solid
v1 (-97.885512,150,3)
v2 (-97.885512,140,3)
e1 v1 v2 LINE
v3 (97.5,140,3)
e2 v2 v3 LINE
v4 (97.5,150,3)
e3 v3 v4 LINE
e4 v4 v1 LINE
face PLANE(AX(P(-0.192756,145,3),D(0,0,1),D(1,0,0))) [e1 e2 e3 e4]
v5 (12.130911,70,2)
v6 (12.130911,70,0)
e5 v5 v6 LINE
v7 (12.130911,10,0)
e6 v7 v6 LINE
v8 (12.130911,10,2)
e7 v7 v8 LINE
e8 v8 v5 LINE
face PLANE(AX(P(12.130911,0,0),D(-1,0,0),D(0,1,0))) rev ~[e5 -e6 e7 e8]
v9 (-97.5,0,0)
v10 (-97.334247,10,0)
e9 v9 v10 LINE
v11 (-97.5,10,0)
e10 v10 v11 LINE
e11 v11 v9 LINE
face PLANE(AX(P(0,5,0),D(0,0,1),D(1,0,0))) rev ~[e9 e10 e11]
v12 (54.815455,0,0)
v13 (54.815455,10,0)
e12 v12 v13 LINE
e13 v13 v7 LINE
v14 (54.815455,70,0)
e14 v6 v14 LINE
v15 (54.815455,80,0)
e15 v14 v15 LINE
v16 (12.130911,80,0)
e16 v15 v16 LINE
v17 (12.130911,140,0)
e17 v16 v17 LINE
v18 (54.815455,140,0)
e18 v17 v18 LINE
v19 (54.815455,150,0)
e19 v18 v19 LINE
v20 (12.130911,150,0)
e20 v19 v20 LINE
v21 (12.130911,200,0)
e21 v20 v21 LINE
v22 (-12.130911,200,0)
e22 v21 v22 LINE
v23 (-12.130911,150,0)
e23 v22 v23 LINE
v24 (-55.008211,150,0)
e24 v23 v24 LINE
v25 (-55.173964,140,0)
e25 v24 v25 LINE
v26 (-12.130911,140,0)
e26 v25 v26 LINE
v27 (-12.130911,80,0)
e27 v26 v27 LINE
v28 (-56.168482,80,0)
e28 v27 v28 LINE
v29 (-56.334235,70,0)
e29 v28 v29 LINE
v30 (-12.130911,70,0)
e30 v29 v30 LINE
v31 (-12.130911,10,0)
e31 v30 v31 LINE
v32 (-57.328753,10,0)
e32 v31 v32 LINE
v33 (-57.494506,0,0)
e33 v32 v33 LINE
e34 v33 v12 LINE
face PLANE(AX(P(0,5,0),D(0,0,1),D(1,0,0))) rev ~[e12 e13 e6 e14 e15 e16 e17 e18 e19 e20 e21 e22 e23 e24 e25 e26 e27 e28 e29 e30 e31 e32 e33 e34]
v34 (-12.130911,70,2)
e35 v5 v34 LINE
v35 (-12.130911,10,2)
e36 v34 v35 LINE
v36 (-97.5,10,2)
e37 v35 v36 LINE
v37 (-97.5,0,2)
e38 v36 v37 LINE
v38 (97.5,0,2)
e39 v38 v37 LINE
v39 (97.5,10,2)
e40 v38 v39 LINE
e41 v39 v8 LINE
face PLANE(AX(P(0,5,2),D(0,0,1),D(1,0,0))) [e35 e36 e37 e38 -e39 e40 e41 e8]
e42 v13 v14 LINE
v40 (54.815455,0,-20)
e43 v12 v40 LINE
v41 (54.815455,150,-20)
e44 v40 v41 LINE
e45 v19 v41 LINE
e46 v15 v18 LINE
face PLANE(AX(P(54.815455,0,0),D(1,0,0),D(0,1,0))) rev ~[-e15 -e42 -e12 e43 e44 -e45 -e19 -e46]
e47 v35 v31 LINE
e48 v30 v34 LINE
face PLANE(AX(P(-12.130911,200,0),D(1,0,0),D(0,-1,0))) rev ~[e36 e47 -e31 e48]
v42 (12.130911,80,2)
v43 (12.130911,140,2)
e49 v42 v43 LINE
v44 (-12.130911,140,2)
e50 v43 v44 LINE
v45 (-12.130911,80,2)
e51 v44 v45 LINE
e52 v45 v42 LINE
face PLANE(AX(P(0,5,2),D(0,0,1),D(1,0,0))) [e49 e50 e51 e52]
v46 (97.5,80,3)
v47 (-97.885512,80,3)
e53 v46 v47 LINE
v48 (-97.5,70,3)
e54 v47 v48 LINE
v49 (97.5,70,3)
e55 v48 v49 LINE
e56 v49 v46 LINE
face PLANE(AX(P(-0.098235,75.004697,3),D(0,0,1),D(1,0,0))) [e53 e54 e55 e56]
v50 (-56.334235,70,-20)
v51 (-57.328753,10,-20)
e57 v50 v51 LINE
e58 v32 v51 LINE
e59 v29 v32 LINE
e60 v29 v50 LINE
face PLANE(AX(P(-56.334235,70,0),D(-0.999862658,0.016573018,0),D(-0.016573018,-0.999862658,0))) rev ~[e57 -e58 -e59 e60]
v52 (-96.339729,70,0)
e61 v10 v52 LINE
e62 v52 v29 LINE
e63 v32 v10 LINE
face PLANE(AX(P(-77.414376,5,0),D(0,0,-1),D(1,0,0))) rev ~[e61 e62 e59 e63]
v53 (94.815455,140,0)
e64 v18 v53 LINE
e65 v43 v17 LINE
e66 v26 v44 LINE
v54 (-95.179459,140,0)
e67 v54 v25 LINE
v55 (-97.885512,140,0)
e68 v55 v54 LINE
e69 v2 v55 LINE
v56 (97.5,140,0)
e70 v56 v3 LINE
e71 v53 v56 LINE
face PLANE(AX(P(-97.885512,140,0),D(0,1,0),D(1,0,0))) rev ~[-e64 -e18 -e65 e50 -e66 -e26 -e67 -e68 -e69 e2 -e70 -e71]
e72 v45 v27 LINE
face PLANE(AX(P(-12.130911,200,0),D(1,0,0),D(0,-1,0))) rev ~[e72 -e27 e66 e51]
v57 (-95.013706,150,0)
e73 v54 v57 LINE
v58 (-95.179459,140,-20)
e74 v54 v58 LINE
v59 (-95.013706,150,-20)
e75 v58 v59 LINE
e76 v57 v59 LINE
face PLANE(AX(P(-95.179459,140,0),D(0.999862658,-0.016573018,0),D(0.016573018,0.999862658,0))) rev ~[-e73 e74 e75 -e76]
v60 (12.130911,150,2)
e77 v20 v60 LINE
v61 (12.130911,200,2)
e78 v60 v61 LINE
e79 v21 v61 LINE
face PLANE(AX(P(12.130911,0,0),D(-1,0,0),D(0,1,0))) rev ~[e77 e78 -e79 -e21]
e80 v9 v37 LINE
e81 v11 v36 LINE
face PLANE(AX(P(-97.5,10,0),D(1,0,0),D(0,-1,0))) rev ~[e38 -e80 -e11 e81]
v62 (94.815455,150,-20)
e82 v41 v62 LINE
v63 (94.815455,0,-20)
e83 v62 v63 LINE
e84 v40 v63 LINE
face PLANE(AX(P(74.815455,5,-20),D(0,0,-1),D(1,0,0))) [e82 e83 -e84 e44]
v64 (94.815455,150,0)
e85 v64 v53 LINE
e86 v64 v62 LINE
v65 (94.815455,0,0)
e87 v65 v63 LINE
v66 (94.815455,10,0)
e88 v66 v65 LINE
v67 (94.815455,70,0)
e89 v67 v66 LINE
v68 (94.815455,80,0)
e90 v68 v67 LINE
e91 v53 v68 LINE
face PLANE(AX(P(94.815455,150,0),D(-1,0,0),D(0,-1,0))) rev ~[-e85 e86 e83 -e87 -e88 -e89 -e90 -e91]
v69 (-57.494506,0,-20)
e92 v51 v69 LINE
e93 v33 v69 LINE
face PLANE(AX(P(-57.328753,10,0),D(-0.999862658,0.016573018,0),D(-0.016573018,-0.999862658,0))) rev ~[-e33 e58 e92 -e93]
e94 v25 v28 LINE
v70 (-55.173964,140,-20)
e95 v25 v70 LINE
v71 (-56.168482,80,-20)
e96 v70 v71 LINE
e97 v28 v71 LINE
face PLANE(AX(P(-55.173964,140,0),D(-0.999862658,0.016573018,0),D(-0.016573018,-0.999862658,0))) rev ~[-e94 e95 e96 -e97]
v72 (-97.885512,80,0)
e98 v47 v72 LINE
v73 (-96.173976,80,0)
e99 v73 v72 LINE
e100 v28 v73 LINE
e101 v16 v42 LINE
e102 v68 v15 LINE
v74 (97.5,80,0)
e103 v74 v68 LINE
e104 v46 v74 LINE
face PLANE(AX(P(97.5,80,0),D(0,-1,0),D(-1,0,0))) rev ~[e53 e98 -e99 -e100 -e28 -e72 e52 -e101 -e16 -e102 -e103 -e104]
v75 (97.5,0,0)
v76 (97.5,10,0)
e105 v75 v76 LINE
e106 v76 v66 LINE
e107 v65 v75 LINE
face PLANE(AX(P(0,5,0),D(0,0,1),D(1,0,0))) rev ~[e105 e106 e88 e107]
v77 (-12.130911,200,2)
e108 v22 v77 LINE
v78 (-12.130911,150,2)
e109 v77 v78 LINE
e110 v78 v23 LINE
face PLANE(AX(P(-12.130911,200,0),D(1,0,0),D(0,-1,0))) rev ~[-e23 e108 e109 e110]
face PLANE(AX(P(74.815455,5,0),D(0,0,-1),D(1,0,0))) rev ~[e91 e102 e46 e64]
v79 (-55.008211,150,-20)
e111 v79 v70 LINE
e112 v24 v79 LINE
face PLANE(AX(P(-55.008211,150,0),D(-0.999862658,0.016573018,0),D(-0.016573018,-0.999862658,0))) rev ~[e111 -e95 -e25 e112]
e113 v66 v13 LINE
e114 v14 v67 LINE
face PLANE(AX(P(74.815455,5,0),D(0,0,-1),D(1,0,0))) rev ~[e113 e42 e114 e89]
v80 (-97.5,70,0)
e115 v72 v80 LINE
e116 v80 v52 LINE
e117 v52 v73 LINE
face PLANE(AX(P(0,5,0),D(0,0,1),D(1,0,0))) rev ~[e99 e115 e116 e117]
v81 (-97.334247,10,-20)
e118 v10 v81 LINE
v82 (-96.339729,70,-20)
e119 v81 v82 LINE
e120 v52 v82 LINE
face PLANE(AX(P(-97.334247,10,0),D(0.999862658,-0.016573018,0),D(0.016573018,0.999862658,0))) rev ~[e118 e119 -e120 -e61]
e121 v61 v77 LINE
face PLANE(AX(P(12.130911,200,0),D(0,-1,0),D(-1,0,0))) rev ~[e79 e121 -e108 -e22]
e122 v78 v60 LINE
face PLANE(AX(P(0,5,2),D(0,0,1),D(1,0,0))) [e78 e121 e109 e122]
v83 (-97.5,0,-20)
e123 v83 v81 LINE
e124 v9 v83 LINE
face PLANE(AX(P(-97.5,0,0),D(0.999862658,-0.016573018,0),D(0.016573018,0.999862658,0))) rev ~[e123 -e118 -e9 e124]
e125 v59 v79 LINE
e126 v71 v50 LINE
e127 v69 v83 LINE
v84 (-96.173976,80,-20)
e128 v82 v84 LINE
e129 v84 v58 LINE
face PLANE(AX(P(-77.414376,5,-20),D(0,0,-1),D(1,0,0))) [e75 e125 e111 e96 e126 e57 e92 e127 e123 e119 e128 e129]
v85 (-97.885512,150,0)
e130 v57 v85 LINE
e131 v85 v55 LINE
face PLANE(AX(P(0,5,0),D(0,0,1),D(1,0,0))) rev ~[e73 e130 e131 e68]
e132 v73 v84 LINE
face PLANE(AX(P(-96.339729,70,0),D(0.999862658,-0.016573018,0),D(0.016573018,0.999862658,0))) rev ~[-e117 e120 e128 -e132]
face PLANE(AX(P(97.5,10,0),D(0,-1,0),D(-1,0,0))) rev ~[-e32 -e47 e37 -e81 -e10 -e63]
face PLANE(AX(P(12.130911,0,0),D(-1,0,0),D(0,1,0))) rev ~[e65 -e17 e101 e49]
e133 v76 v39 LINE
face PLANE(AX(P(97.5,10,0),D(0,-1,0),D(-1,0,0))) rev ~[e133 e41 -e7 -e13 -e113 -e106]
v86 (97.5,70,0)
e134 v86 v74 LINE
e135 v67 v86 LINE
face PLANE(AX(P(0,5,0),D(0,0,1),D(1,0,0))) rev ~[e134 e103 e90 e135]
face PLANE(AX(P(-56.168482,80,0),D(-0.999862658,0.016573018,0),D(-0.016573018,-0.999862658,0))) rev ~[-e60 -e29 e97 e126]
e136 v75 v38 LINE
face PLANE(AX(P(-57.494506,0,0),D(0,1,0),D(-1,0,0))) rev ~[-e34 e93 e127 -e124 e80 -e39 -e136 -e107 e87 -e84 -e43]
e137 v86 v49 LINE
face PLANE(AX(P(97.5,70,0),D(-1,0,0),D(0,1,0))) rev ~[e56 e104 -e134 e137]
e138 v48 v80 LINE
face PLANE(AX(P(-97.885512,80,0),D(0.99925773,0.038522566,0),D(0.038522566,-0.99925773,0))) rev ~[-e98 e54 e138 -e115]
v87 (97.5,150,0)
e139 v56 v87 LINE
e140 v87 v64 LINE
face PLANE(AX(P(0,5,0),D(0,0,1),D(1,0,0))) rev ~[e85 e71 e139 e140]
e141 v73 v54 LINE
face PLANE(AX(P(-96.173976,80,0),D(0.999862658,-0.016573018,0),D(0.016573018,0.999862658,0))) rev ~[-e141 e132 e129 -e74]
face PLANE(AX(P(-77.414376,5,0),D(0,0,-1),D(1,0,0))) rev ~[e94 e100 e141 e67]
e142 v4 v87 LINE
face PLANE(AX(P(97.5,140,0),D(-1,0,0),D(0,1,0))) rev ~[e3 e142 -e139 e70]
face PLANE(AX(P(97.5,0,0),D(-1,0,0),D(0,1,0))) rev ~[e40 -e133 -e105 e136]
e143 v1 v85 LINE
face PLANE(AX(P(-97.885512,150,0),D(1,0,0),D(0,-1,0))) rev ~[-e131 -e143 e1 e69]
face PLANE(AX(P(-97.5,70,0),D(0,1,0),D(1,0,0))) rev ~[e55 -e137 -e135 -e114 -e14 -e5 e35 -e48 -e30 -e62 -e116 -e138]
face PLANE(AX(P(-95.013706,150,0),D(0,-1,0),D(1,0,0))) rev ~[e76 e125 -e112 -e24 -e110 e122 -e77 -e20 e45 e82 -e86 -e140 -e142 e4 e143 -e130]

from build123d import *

# Parameters (mm, degrees)
F1_DEPTH = 2
F3_DEPTH = 2
F4_DEPTH = 3
F5_DEPTH = 2
F6_W     = 40
F6_H     = 10
F6_H_2   = 60
F7_DEPTH = 20


with BuildPart() as f1:
    # F0 (on Top) → F1 (new body)
    with BuildSketch(Plane.XY):
        Polygon((-12.130910923, 0), (0, 0), (12.130910923, 0), (12.130910923, 200), (-12.130910923, 200), align=None)
    extrude(amount=F1_DEPTH)

    # F2 (on Top) → F3 (join)
    with BuildSketch(Plane.XY):
        Polygon((-97.5, 0), (0, 0), (97.5, 0), (97.5, 10), (-97.5, 10), align=None)
        Polygon((-97.5, 70), (0, 70), (97.5, 70), (97.5, 80), (-97.8855118155, 80), align=None)
        Polygon((-97.8855118155, 140), (0, 140), (97.5, 140), (97.5, 150), (-97.8855118155, 150), align=None)
    extrude(amount=F3_DEPTH)

    # F2 (on Top) → F4 (join)
    with BuildSketch(Plane.XY):
        Polygon((-97.5, 70), (0, 70), (97.5, 70), (97.5, 80), (-97.8855118155, 80), align=None)
        Polygon((-97.8855118155, 140), (0, 140), (97.5, 140), (97.5, 150), (-97.8855118155, 150), align=None)
    extrude(amount=F4_DEPTH)

    # F2 (on Top) → F5 (join)
    with BuildSketch(Plane.XY):
        Polygon((-97.5, 0), (0, 0), (97.5, 0), (97.5, 10), (-97.5, 10), align=None)
        Polygon((-97.5, 70), (0, 70), (97.5, 70), (97.5, 80), (-97.8855118155, 80), align=None)
        Polygon((-97.8855118155, 140), (0, 140), (97.5, 140), (97.5, 150), (-97.8855118155, 150), align=None)
    extrude(amount=F5_DEPTH)

    # F6 (on face) → F7 (join)
    with BuildSketch(Plane(origin=(0, 0, 0), x_dir=(1, 0, 0), z_dir=(0, 0, -1))):
        Polygon((-57.4945055695, 0), (-97.5, 0), (-97.3342470533, -10), (-57.3287526228, -10), align=None)
        Polygon((-57.3287526228, -10), (-97.3342470533, -10), (-96.3397293732, -70), (-56.3342349427, -70), align=None)
        with Locations((74.8154554615, -5)):
            Rectangle(F6_W, F6_H)
        Polygon((-56.3342349427, -70), (-96.3397293732, -70), (-96.1739764266, -80), (-56.168481996, -80), align=None)
        with Locations((74.8154554615, -40)):
            Rectangle(F6_W, F6_H_2)
        Polygon((-56.168481996, -80), (-96.1739764266, -80), (-95.1794587465, -140), (-55.173964316, -140), align=None)
        with Locations((74.8154554615, -75)):
            Rectangle(F6_W, F6_H)
        Polygon((-55.173964316, -140), (-95.1794587465, -140), (-95.0137057998, -150), (-55.0082113693, -150), align=None)
        with Locations((74.8154554615, -110)):
            Rectangle(F6_W, F6_H_2)
        with Locations((74.8154554615, -145)):
            Rectangle(F6_W, F6_H)
    extrude(amount=F7_DEPTH)


solid = f1.part
